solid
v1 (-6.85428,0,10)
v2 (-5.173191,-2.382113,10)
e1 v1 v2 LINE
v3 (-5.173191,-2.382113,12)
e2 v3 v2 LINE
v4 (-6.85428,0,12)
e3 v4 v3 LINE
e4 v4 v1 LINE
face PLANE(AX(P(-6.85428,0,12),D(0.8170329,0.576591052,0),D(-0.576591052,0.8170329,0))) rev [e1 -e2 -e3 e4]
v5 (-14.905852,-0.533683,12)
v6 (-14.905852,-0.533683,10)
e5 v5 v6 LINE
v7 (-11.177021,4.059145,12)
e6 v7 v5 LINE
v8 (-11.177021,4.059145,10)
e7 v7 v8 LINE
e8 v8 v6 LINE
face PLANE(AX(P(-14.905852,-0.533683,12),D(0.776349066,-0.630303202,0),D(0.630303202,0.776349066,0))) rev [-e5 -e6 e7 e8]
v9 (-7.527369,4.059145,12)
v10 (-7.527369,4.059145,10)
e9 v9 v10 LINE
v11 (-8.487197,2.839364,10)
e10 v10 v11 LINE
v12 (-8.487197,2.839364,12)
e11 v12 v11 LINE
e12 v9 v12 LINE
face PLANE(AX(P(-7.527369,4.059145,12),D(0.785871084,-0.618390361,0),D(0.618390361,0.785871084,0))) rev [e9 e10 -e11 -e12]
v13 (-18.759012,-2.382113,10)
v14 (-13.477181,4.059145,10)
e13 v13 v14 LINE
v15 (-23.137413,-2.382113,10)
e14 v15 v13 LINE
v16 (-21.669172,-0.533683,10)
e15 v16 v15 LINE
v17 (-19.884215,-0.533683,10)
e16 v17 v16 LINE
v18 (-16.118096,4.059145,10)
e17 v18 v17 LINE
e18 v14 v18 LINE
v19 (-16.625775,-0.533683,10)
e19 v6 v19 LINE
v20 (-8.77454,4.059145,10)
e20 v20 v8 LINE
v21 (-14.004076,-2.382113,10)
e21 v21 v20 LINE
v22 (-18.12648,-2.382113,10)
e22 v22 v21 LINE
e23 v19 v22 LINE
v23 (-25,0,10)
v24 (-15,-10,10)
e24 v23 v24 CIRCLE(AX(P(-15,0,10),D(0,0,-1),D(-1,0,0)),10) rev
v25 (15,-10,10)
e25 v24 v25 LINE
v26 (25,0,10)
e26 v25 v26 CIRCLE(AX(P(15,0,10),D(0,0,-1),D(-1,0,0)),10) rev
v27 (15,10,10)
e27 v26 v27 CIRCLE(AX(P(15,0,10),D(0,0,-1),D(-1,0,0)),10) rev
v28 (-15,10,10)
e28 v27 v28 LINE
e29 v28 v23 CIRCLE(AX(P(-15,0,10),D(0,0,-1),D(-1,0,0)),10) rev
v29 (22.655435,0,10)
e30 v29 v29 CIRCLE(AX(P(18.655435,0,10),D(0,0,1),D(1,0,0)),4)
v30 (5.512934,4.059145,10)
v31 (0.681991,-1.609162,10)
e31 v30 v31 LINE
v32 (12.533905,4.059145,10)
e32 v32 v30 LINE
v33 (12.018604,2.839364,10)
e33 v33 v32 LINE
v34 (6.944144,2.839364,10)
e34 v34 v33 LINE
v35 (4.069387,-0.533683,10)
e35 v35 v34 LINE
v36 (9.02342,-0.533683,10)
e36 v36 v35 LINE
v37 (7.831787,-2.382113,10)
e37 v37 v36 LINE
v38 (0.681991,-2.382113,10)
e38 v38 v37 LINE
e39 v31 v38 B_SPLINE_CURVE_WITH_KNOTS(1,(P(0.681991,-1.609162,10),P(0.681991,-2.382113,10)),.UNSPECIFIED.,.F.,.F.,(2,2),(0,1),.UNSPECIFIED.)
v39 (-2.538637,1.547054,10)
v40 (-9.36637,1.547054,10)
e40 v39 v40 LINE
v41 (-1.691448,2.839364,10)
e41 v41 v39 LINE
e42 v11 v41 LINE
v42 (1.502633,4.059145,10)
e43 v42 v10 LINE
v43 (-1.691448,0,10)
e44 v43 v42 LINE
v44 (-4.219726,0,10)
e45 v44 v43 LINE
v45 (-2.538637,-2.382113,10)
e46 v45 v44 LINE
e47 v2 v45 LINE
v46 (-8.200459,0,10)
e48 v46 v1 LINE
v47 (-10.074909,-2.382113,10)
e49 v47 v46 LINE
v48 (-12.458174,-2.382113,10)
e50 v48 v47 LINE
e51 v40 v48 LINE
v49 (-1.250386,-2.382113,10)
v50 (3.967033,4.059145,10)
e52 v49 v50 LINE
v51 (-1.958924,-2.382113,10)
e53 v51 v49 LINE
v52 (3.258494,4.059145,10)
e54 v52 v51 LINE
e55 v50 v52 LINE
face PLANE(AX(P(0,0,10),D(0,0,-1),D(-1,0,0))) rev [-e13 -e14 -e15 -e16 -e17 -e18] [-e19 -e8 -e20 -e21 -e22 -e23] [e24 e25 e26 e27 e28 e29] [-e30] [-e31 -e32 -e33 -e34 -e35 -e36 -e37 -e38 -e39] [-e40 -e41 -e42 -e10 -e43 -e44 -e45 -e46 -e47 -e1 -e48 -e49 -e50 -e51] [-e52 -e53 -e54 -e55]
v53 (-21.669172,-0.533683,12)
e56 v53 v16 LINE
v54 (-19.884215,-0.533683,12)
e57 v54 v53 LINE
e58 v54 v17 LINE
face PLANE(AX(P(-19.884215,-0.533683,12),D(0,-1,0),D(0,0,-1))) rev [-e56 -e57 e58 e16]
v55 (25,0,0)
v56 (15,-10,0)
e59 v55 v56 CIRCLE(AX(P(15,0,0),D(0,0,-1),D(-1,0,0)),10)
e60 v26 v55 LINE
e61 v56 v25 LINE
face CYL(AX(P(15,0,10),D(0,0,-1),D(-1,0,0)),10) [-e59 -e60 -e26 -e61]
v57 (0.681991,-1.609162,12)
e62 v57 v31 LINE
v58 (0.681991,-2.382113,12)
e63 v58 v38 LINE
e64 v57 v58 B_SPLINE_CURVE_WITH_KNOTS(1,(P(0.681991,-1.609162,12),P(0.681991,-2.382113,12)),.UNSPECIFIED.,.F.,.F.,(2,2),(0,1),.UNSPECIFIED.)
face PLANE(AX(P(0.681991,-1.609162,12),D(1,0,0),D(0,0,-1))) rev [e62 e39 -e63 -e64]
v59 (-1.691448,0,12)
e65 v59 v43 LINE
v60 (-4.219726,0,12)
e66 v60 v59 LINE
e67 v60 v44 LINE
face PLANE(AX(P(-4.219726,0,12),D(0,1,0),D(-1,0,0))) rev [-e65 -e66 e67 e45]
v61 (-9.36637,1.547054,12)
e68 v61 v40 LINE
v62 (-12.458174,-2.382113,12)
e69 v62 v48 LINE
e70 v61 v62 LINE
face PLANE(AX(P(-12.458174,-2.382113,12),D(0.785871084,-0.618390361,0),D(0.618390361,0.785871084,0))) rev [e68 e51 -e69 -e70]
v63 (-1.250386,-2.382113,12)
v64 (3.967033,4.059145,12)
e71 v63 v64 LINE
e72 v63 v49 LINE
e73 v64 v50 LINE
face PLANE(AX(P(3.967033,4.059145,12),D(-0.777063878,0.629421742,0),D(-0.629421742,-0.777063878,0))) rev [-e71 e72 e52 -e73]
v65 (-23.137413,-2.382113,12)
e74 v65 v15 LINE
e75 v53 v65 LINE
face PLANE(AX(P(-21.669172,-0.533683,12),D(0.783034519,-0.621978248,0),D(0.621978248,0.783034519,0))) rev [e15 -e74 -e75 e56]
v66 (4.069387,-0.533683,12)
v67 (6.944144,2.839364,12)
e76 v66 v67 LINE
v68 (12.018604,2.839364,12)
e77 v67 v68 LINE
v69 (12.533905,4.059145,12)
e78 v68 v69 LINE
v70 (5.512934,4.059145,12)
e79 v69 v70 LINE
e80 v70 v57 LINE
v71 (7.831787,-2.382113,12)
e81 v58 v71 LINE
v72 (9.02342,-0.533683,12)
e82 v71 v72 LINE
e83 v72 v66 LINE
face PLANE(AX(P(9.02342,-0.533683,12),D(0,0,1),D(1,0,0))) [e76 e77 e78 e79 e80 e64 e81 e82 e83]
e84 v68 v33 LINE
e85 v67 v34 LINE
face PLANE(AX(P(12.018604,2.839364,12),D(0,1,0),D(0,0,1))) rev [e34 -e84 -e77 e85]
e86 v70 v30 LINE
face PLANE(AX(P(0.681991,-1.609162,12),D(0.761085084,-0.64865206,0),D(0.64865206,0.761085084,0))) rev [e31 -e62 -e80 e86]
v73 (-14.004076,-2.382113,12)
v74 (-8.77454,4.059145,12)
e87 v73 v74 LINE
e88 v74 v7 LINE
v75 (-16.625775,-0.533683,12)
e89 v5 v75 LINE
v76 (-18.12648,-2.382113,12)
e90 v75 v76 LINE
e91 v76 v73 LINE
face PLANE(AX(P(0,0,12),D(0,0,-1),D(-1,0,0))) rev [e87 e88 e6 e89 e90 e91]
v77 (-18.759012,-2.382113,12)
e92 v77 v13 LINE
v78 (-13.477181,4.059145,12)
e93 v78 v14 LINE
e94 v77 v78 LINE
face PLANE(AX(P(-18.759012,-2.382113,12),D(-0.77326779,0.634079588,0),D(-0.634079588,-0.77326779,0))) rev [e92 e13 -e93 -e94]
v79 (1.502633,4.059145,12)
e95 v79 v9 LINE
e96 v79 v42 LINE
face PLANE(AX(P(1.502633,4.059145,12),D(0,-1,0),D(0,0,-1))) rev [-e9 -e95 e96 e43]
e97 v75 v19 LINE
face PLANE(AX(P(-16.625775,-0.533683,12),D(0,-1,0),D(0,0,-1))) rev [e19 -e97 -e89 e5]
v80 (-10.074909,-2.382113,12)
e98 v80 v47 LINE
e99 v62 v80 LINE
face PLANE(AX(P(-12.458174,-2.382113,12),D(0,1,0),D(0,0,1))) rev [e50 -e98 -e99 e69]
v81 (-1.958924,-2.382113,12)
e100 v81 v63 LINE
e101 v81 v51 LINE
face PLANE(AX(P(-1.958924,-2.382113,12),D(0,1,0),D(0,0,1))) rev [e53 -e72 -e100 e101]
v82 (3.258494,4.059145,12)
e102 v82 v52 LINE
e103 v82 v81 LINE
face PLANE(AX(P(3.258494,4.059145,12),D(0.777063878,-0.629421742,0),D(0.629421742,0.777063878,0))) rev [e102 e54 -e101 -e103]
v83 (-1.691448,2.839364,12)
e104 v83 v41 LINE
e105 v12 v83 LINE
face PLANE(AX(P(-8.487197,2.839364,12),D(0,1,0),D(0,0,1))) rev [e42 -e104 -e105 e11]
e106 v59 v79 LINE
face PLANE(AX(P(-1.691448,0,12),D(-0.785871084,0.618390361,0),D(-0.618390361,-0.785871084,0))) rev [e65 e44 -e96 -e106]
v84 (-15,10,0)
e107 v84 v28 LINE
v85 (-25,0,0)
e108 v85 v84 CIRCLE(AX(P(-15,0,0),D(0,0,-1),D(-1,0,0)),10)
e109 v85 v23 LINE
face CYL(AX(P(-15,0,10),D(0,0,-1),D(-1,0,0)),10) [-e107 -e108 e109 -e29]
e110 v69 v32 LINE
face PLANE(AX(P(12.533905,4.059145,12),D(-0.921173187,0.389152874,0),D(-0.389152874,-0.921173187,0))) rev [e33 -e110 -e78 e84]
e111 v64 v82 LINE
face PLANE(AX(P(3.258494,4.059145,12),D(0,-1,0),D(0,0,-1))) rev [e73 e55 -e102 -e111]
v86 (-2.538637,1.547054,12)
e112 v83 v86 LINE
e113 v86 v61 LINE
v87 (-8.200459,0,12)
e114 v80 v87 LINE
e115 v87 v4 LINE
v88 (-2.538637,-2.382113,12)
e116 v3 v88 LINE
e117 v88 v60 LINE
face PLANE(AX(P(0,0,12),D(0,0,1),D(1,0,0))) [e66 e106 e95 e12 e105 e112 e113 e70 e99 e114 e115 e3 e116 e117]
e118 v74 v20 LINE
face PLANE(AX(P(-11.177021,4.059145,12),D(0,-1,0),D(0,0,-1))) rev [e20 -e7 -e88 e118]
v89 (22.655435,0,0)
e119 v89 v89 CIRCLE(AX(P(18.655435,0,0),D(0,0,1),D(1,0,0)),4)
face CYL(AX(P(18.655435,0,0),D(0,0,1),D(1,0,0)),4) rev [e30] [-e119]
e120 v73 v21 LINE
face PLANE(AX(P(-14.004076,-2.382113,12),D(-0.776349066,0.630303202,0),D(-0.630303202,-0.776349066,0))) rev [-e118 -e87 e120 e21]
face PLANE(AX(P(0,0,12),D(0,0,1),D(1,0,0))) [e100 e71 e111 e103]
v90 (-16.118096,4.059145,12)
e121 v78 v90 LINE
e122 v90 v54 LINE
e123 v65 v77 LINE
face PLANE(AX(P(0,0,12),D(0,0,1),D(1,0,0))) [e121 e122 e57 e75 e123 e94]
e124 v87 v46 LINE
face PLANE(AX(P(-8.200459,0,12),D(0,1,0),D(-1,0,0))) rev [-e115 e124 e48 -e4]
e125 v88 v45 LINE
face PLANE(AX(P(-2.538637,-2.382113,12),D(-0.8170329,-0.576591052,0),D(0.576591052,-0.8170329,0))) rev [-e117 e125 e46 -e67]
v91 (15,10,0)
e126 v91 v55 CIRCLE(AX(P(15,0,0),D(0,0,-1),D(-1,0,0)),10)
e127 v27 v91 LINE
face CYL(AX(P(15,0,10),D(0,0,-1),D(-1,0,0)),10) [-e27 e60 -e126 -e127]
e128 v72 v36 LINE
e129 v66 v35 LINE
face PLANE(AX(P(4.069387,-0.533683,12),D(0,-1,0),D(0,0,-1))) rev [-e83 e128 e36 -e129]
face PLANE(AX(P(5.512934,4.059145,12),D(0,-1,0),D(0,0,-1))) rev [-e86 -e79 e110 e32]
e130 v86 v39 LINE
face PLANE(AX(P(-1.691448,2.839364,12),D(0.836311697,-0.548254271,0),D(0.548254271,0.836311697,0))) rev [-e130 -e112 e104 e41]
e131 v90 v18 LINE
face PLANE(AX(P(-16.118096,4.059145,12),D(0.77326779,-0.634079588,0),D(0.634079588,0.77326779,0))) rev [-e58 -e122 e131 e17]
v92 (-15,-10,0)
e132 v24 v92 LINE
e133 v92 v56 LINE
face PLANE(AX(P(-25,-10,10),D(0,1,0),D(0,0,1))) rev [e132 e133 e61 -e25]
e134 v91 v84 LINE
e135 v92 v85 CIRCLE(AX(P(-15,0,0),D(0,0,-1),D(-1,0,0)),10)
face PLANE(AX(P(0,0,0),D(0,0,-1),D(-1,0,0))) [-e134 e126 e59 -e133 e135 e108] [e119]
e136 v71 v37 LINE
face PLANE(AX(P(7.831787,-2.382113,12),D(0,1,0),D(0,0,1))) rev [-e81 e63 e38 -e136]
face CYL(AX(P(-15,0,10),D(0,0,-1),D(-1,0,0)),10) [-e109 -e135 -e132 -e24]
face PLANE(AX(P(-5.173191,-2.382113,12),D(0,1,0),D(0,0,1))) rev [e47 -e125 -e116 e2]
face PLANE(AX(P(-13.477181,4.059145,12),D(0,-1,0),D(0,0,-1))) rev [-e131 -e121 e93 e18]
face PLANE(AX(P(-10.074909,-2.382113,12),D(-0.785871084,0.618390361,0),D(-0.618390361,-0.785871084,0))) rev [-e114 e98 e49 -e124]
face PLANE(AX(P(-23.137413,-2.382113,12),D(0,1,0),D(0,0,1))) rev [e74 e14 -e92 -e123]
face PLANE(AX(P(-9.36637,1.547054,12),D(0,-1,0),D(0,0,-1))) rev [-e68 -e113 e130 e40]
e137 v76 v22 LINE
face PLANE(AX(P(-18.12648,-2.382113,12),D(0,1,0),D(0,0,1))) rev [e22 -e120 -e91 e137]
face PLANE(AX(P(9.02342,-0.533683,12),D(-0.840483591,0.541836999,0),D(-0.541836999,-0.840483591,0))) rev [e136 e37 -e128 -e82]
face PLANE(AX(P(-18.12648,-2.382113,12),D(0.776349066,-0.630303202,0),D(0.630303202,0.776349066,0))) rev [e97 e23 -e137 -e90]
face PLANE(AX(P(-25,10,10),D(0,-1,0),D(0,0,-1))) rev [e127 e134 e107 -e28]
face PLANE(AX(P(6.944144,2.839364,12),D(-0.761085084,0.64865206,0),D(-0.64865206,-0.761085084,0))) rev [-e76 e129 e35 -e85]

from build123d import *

# Parameters (mm, degrees)
ESQUISSE1_W             = 50
ESQUISSE1_H             = 20
BOSS_EXTRU_1_DEPTH      = 10
CONG_1_R                = 10
ESQUISSE2_R             = 4
ENL_V_MAT_EXTRU_1_DEPTH = 29.722813233
BOSS_EXTRU_2_DEPTH      = 2


with BuildPart() as part:
    # Esquisse1 → Boss.-Extru.1 (new body)
    with BuildSketch(Plane.XY):
        Rectangle(ESQUISSE1_W, ESQUISSE1_H)
    extrude(amount=BOSS_EXTRU_1_DEPTH)

    # Congé1
    cong_1_edges = [part.edges().sort_by_distance(p)[0] for p in [
        (-25, 10, 5),
        (25, 10, 5),
        (25, -10, 5),
        (-25, -10, 5),
    ]]
    fillet(cong_1_edges, radius=CONG_1_R - 0.0001)  # a hair under: the kernel refuses the full size

    # Esquisse2 → Enlèv. mat.-Extru.1 (cut, through all)
    with BuildSketch(Plane.XY.offset(10)):
        with Locations((18.655435278, 0)):
            Circle(ESQUISSE2_R)
    extrude(amount=-ENL_V_MAT_EXTRU_1_DEPTH, mode=Mode.SUBTRACT)

    # Esquisse3 → Boss.-Extru.2 (add)
    with BuildSketch(Plane.XY.offset(10)):
        Polygon((-23.137412504, -2.382112664), (-18.75901173, -2.382112664), (-13.477180662, 4.059144735), (-16.118096196, 4.059144735), (-19.884214818, -0.533682853), (-21.669171822, -0.533682853), align=None)
        Polygon((-18.126480253, -2.382112664), (-14.004075518, -2.382112664), (-8.774539808, 4.059144735), (-11.177021234, 4.059144735), (-14.905851553, -0.533682853), (-16.625774862, -0.533682853), align=None)
        Polygon((-12.458173742, -2.382112664), (-10.074908504, -2.382112664), (-8.200459195, 0), (-6.854279805, 0), (-5.173191017, -2.382112664), (-2.538637347, -2.382112664), (-4.219726135, 0), (-1.691447938, 0), (1.502633165, 4.059144735), (-7.5273695, 4.059144735), (-8.487196781, 2.839364232), (-1.691447938, 2.839364232), (-2.538637347, 1.547054349), (-9.36637019, 1.547054349), align=None)
        Polygon((3.258494312, 4.059144735), (3.967032626, 4.059144735), (-1.250385868, -2.382112664), (-1.958924181, -2.382112664), align=None)
        Polygon((7.831787065, -2.382112664), (0.681991352, -2.382112664), (0.681991352, -1.609161776), (5.512934401, 4.059144735), (12.533904966, 4.059144735), (12.018604374, 2.839364232), (6.944143524, 2.839364232), (4.069387486, -0.533682853), (9.023419684, -0.533682853), align=None)
    extrude(amount=BOSS_EXTRU_2_DEPTH)


solid = part.part
